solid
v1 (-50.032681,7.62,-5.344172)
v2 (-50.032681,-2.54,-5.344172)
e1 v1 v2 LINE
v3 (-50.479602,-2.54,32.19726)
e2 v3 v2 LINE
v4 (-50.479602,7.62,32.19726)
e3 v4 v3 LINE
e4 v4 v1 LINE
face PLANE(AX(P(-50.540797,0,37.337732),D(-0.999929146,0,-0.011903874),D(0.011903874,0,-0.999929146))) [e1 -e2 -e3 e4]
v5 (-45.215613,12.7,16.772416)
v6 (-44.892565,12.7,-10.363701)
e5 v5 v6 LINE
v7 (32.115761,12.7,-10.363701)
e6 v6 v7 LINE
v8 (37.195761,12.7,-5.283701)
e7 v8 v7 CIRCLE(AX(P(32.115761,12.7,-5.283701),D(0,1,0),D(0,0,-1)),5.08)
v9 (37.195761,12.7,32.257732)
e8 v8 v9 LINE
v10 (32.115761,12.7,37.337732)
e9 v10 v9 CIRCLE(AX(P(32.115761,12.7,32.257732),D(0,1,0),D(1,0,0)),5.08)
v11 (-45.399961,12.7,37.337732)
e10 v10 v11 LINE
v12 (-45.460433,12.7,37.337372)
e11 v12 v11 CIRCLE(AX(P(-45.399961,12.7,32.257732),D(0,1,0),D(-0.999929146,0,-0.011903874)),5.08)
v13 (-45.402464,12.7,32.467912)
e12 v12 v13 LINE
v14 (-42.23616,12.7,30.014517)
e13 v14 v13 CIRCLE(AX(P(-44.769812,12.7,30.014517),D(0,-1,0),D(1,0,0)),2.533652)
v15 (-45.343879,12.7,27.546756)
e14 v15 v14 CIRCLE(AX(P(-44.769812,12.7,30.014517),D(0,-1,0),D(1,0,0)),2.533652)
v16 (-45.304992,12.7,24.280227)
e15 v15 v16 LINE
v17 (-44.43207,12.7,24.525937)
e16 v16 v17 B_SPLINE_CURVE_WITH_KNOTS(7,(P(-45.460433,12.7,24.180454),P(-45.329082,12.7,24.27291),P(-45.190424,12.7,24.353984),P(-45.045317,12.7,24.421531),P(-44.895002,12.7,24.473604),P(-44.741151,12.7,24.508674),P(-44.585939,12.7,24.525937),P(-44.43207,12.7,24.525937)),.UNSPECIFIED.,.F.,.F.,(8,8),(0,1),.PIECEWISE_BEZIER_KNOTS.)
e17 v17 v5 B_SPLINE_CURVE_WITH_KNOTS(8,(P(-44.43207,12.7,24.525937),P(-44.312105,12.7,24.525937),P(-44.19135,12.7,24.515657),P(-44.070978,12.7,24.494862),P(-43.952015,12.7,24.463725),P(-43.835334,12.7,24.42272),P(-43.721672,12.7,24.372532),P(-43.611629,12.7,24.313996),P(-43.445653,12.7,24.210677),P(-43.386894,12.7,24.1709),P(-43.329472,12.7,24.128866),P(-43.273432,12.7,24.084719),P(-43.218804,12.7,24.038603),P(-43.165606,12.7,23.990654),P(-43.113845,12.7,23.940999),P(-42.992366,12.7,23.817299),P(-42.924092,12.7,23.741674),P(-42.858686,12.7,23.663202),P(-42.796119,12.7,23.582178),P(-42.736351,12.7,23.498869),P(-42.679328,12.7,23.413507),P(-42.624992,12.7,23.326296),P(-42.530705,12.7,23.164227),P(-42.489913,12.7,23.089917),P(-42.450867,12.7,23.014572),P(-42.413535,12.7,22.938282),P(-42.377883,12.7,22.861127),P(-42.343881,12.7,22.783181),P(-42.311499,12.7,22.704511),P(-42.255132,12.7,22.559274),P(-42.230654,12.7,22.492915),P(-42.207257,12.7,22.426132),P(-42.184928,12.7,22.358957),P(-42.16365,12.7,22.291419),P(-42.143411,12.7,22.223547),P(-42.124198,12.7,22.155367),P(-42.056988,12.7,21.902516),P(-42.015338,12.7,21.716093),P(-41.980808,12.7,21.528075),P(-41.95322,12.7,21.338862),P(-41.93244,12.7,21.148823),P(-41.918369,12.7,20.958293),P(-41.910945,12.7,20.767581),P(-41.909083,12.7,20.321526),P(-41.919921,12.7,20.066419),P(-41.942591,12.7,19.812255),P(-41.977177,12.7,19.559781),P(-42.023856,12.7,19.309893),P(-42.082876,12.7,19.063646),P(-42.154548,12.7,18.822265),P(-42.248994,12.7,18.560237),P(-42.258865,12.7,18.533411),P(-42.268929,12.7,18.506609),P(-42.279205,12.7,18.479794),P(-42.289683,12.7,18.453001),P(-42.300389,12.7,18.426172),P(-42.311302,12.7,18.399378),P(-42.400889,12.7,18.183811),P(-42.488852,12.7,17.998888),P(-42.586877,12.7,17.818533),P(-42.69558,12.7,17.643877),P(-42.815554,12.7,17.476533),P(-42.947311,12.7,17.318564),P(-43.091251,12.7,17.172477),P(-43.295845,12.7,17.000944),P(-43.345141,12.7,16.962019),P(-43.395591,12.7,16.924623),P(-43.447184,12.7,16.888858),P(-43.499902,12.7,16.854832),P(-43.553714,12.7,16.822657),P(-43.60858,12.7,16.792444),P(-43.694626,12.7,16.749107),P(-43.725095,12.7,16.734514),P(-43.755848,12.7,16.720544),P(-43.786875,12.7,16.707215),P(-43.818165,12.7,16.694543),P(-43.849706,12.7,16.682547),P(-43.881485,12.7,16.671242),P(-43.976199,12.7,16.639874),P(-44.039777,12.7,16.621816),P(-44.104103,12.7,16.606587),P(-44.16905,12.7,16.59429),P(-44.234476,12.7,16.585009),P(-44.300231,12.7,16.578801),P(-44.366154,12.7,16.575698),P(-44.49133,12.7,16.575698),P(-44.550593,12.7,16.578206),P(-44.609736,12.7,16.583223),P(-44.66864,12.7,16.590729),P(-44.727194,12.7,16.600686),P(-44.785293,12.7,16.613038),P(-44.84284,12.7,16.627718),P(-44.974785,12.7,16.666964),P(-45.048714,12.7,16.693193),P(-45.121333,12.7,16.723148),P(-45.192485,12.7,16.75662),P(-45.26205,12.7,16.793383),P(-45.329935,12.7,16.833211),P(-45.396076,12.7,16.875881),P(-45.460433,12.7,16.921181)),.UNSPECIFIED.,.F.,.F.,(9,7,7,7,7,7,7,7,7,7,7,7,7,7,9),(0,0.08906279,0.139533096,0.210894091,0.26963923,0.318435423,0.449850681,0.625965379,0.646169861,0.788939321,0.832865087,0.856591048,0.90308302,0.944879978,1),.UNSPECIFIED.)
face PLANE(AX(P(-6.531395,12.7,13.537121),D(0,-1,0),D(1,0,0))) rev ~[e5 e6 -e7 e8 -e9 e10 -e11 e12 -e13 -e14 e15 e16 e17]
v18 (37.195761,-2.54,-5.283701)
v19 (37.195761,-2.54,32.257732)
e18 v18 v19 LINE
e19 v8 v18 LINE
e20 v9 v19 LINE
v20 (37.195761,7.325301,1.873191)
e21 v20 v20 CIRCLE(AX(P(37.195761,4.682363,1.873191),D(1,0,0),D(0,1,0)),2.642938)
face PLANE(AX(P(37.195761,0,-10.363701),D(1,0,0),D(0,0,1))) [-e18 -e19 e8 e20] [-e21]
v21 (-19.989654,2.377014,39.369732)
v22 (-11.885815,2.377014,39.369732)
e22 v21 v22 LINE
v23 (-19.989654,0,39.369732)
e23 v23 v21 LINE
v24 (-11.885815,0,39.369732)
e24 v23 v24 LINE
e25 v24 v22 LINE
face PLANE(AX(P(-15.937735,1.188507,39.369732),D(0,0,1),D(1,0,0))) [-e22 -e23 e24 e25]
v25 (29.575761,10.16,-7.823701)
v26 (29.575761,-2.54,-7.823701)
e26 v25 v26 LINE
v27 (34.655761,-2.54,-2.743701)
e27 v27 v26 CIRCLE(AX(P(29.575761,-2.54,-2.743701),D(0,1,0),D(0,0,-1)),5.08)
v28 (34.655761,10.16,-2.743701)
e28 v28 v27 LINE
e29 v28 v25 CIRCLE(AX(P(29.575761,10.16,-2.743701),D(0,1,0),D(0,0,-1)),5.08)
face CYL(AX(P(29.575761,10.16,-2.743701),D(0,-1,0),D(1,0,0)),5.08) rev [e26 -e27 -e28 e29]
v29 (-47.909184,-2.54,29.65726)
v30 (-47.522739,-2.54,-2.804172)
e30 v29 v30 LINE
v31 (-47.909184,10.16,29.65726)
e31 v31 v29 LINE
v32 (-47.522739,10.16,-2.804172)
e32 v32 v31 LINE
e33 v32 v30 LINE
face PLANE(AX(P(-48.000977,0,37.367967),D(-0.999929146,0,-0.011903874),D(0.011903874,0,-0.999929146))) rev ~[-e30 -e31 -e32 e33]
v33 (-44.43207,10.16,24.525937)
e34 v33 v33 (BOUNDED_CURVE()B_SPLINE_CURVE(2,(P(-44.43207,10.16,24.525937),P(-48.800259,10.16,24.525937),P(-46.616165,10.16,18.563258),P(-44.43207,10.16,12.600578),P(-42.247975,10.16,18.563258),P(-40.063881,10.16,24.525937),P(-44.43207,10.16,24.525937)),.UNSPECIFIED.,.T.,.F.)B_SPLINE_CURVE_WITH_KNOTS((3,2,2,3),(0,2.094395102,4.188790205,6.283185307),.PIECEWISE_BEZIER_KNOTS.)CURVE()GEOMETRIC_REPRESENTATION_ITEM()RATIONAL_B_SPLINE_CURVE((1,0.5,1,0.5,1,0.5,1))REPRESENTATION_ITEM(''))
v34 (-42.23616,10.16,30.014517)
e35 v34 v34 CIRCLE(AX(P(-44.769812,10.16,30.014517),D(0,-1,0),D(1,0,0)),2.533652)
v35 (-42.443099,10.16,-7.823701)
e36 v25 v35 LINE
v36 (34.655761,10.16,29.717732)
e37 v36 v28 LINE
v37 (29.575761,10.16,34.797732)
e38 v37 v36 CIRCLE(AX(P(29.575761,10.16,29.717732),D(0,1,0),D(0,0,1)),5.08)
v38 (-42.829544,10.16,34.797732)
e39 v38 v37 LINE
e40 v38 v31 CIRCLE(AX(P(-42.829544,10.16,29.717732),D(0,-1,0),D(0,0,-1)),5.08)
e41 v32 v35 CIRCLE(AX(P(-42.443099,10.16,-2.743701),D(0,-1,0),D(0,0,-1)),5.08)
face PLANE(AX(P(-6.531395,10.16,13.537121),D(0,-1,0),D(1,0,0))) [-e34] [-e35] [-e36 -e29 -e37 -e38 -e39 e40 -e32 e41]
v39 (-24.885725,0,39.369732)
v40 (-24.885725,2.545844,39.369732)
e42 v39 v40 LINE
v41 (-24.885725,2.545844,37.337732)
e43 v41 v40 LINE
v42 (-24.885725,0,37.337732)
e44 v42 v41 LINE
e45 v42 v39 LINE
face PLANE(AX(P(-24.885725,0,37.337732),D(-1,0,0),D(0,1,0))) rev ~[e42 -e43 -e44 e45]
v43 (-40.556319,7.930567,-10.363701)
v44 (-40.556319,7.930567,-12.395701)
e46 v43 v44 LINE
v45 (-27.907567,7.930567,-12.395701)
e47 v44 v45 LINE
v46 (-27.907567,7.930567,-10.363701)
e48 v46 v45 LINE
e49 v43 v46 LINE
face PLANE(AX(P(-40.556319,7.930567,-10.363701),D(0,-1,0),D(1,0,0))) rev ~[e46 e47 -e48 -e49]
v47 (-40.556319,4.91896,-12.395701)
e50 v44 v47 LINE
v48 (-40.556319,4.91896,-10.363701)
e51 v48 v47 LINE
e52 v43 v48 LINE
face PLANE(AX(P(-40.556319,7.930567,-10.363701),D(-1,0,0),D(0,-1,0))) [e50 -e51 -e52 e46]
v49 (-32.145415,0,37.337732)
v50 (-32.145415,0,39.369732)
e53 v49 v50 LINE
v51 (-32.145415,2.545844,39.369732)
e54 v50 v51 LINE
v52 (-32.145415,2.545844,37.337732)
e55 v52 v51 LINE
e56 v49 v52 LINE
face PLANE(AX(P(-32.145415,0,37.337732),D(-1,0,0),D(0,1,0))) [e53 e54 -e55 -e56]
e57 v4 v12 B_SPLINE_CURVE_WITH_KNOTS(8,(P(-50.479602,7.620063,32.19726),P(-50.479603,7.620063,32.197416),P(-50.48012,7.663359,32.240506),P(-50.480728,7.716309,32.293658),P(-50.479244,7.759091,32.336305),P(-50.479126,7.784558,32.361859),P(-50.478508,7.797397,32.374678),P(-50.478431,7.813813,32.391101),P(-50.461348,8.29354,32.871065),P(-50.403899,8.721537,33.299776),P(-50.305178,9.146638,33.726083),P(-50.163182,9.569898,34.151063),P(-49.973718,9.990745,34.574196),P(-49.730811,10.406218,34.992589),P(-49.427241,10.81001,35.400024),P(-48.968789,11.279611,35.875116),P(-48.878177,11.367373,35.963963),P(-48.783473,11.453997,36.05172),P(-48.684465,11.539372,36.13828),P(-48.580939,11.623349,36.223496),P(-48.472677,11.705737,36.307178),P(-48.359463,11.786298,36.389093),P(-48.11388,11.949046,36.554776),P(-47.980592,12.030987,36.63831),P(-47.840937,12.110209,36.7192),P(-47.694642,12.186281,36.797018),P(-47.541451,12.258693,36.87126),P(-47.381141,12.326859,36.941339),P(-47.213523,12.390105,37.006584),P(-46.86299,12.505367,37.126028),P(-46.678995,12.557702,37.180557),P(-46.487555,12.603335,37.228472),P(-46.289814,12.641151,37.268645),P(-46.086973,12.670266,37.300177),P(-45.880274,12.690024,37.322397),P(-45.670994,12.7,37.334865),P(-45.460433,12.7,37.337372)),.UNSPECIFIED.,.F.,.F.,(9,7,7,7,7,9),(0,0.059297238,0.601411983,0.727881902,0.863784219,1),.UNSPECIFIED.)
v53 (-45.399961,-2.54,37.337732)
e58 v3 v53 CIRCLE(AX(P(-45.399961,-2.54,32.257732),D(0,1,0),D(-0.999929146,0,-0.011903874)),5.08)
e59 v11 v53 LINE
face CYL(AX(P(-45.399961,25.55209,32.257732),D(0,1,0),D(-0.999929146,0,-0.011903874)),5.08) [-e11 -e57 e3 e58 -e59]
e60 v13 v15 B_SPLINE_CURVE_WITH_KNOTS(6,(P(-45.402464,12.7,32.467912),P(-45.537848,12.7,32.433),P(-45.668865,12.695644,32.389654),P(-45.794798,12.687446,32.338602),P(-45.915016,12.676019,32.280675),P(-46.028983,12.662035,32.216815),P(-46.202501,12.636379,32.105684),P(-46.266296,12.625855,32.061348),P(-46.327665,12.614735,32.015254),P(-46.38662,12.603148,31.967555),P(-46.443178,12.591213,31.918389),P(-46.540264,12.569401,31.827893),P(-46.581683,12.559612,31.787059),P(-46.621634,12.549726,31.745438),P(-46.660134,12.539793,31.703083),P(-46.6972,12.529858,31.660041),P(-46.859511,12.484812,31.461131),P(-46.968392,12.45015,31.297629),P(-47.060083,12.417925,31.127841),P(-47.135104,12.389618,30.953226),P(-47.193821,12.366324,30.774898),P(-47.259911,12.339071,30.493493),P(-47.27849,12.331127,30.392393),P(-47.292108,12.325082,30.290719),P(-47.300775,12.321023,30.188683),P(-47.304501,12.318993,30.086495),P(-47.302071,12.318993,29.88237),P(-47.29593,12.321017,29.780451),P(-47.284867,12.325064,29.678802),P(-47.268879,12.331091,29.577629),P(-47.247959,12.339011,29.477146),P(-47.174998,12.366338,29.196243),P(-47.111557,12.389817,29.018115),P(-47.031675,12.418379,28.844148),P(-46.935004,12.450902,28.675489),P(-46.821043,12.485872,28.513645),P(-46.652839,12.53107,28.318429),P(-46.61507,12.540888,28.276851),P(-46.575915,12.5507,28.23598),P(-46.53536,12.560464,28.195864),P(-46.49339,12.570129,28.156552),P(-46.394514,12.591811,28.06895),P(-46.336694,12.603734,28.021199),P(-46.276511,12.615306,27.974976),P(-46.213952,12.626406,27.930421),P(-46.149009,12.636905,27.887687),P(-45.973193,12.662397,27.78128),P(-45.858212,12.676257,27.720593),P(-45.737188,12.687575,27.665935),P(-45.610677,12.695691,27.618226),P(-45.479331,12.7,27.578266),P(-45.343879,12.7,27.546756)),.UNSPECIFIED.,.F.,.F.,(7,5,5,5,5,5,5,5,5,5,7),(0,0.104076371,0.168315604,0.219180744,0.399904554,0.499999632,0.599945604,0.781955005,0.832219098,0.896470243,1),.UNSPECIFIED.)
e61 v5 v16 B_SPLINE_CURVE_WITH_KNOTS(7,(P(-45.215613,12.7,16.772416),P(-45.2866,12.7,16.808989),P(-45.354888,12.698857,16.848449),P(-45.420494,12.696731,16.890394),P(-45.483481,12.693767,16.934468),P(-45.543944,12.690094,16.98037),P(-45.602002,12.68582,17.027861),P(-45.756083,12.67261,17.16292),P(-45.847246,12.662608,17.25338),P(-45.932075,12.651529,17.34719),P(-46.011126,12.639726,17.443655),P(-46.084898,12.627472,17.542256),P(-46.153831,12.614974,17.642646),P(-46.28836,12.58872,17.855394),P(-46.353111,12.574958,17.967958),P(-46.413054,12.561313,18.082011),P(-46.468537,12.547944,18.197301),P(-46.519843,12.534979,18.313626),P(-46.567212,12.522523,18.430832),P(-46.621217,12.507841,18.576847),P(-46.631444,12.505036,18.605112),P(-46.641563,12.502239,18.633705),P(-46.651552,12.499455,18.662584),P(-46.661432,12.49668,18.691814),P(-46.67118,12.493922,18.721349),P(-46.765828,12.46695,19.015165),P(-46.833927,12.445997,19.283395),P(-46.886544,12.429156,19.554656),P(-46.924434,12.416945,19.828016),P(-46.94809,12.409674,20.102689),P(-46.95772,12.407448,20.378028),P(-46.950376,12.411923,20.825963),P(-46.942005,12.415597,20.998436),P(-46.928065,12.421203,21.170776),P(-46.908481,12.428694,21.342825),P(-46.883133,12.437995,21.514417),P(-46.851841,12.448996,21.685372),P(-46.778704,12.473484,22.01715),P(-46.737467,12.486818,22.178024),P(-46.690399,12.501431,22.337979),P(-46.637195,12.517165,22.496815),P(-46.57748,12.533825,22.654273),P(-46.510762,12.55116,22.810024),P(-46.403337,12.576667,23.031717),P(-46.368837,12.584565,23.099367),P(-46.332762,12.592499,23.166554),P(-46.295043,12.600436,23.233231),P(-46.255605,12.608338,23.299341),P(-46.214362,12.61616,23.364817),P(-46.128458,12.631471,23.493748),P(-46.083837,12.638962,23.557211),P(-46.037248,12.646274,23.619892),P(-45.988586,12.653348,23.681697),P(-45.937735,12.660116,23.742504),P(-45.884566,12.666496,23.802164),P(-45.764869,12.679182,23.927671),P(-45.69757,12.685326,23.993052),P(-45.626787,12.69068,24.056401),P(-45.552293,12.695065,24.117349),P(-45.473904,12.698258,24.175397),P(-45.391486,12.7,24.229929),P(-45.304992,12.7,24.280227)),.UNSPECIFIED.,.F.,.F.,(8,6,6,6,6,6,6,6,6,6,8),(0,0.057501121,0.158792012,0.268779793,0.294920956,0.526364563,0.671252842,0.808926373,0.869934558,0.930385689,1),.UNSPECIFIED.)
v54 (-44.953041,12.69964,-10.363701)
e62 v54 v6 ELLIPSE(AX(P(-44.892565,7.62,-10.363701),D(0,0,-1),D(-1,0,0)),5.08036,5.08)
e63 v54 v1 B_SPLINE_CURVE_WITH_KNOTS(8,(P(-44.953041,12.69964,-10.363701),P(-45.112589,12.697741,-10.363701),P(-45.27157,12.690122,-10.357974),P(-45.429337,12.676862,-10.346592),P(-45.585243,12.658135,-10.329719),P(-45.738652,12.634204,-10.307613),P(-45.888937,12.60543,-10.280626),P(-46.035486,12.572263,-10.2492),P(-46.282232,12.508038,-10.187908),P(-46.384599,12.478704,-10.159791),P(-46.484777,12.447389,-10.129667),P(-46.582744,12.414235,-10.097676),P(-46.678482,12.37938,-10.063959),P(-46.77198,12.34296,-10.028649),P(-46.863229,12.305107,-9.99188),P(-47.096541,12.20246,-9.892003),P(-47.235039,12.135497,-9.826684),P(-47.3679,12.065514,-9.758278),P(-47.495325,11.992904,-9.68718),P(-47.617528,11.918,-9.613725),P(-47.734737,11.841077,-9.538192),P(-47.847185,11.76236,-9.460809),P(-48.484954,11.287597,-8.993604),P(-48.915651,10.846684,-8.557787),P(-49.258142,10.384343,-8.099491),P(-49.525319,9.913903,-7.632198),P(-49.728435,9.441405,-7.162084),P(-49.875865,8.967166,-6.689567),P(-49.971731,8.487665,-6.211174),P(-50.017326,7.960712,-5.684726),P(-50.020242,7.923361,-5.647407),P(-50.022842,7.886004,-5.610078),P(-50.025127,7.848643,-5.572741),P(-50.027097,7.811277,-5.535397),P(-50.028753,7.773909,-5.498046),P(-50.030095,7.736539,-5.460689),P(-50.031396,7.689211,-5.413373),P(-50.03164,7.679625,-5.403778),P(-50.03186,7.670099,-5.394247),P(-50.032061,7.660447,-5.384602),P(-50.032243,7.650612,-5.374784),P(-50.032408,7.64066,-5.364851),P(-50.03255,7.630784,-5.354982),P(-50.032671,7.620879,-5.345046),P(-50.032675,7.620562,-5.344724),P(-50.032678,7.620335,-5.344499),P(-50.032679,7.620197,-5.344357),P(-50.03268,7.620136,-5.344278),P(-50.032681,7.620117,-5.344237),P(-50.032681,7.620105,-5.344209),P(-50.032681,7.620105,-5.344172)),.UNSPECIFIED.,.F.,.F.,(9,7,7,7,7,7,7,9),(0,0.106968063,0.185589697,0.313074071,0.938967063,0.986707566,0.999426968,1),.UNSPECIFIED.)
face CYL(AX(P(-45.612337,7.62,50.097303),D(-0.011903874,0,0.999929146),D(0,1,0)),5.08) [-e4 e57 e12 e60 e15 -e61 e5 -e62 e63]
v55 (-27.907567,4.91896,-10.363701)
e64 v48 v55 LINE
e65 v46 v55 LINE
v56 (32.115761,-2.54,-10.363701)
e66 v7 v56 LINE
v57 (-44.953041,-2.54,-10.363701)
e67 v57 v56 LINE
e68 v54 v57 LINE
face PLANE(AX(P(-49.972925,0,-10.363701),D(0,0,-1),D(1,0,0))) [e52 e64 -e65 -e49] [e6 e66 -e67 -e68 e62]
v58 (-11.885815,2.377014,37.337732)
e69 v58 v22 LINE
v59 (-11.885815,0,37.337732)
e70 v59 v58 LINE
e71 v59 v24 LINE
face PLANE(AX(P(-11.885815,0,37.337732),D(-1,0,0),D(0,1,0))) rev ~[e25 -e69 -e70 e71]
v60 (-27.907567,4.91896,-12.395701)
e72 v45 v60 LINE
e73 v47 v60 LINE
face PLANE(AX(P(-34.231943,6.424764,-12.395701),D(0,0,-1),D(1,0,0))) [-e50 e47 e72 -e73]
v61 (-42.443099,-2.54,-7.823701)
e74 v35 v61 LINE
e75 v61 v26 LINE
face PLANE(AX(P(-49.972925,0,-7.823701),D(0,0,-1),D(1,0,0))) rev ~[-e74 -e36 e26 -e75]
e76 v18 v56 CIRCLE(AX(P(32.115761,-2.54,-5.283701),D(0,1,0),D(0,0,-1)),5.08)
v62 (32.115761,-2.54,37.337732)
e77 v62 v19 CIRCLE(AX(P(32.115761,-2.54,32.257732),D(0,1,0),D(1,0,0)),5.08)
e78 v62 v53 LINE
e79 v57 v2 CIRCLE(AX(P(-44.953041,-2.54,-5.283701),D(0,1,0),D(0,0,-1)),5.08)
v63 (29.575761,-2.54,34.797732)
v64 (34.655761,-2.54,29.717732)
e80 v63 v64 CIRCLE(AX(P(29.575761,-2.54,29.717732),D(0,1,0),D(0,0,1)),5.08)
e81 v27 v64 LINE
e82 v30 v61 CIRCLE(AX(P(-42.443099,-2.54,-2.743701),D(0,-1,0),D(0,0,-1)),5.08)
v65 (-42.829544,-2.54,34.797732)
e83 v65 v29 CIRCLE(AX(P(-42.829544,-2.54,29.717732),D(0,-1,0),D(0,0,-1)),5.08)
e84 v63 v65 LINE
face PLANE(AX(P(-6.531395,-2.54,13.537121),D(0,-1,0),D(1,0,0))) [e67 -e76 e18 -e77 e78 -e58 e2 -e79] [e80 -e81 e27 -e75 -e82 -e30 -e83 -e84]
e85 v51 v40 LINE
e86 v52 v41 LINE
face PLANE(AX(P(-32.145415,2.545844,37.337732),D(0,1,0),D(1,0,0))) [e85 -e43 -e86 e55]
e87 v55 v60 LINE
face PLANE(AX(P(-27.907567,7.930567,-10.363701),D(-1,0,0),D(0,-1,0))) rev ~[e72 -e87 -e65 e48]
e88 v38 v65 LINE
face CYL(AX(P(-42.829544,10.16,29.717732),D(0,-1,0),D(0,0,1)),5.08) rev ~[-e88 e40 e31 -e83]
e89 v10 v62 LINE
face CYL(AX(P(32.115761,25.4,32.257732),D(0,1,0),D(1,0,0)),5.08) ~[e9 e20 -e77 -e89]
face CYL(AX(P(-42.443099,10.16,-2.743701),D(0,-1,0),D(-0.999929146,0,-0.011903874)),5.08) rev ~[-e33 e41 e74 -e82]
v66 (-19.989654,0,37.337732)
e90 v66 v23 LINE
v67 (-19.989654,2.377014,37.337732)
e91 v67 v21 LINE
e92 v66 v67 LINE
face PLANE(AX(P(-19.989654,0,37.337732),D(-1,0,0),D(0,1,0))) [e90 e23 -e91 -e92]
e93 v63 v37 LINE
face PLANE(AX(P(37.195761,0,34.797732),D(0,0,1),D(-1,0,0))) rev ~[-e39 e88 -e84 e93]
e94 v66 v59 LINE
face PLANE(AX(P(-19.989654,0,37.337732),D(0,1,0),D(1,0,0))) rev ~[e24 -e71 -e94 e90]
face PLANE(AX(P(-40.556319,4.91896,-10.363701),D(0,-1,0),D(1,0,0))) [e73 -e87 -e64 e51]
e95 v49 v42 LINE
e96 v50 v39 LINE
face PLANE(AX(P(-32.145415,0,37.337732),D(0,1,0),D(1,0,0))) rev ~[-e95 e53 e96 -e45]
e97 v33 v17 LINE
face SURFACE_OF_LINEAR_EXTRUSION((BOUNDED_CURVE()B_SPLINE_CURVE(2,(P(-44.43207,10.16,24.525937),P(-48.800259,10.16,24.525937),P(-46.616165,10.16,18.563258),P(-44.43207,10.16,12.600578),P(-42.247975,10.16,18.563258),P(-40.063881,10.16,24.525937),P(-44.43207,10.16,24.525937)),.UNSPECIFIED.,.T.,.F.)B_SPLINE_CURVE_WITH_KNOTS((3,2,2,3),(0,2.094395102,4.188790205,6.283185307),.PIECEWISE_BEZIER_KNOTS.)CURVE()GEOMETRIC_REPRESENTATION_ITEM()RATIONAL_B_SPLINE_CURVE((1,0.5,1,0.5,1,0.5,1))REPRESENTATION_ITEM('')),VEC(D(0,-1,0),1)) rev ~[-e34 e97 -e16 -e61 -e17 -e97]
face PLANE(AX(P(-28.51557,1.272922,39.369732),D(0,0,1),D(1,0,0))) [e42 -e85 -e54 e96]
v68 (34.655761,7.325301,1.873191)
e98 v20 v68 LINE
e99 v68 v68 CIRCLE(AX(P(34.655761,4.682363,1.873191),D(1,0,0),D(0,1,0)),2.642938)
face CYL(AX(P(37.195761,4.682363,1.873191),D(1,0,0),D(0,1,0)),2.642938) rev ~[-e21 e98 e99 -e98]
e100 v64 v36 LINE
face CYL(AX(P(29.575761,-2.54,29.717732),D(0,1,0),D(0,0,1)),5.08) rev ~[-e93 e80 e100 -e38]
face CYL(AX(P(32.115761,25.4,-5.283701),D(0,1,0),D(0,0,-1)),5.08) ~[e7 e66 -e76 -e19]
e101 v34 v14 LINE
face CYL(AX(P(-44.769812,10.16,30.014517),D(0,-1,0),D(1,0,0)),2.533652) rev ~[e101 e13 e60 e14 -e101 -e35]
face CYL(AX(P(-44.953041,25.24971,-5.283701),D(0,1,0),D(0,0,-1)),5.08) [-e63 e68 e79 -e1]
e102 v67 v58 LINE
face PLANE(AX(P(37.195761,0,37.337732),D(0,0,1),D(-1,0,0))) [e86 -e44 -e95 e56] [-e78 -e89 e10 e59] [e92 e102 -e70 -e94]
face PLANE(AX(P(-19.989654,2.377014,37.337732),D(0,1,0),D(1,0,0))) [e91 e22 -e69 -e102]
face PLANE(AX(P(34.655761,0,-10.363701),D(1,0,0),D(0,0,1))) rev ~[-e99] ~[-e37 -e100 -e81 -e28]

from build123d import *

# Parameters (mm, degrees)
F1_DEPTH    = 12.7
F2_T        = -2.54
F3_R        = 2.5336521523
F4_DEPTH    = 25.4
F5_W        = 12.6487519592
F5_H        = 3.011607565
F6_DEPTH    = 2.032
F7_T1_DEPTH = 51.1041796342
F7_T3_DEPTH = 73.1048124282
F7_T5_DEPTH = 50.4994199847
F7_T7_DEPTH = 50.8
F8_W        = 7.2596892715
F8_H        = 2.5458435994
F8_W_2      = 8.1038391218
F8_H_2      = 2.3770136759
F9_DEPTH    = 2.032
F11_DEPTH   = 5.334
F12_DEPTH   = 10.16
F13_R       = 5.08
F14_R       = 2.6429379381
F15_DEPTH   = 25.4


# Not quite as in the source:
# - a fillet or chamfer that OpenCascade refuses, or shapes differently, is made with other operations: its cross-section is extruded or revolved along the edge and cut away or added


with BuildPart() as f1:
    # F0 (on Front) → F1 (new body, symmetric)
    with BuildSketch(Plane.XZ):
        Polygon((37.1957607567, 37.33773157), (-50.5407974124, 37.33773157), (-49.9729253352, -10.3637007996), (37.1957607567, -10.3637007996), align=None)
    extrude(amount=F1_DEPTH, both=True)

    # F2
    f2_openings = [f1.faces().sort_by_distance(p)[0] for p in [
        (-6.530704, -12.7, 13.512828),
    ]]
    offset(amount=F2_T, openings=f2_openings)

    # F3 (on face) → F4 (cut)
    with BuildSketch(Plane.XZ.offset(-10.16)):
        with Locations((-44.7698123753, 30.0145167857)):
            Circle(F3_R)
    extrude(amount=-F4_DEPTH, mode=Mode.SUBTRACT)

    # F5 (on face) → F6 (join)
    with BuildSketch(Plane(origin=(0, 0, -10.3637007996), x_dir=(1, 0, 0), z_dir=(0, 0, -1))):
        with Locations((-34.2319430783, -6.4247637056)):
            Rectangle(F5_W, F5_H)
    extrude(amount=F6_DEPTH)

    # F7: fillet of radius 5.08 on 5 edges, made by hand

    # F7_s2 → F7_t1 (cut)
    with BuildSketch(Plane.XZ.offset(-25.5520898171)):
        with BuildLine():
            ThreePointArc((-50.4796015492, 32.19725989), (-49.0133806513, 35.8283900433), (-45.3999614856, 37.33773157))
            Line((-45.3999614856, 37.33773157), (-50.5407974124, 37.33773157))
            Line((-50.5407974124, 37.33773157), (-50.4796015492, 32.19725989))
        make_face()
    extrude(amount=F7_T1_DEPTH, mode=Mode.SUBTRACT)

    # F7_s4 → F7_t3 (cut)
    with BuildSketch(Plane(origin=(-0.602773104, 0, 50.6331295472), x_dir=(0, 1, 0), z_dir=(0.011903874, 0, -0.9999291464))):
        with BuildLine():
            ThreePointArc((12.7, -45.0127527613), (11.2121024484, -48.6048552097), (7.62, -50.0927527613))
            Line((7.62, -50.0927527613), (12.7, -50.0927527613))
            Line((12.7, -50.0927527613), (12.7, -45.0127527613))
        make_face()
    extrude(amount=F7_T3_DEPTH, mode=Mode.SUBTRACT)

    # F7_s6 → F7_t5 (cut)
    with BuildSketch(Plane.XZ.offset(-25.2497099923)):
        with BuildLine():
            ThreePointArc((-44.9530413382, -10.3637007996), (-48.5236998115, -8.8971199654), (-50.0326814019, -5.3441724797))
            Line((-50.0326814019, -5.3441724797), (-49.9729253352, -10.3637007996))
            Line((-49.9729253352, -10.3637007996), (-44.9530413382, -10.3637007996))
        make_face()
    extrude(amount=F7_T5_DEPTH, mode=Mode.SUBTRACT)

    # F7_s8 → F7_t7 (cut)
    with BuildSketch(Plane.XZ.offset(-25.4)):
        with BuildLine():
            ThreePointArc((32.1157607567, -10.3637007996), (35.7078632052, -8.8758032481), (37.1957607567, -5.2837007996))
            Line((37.1957607567, -5.2837007996), (37.1957607567, -10.3637007996))
            Line((37.1957607567, -10.3637007996), (32.1157607567, -10.3637007996))
        make_face()
        with BuildLine():
            ThreePointArc((37.1957607567, 32.25773157), (35.7078632052, 35.8498340184), (32.1157607567, 37.33773157))
            Line((32.1157607567, 37.33773157), (37.1957607567, 37.33773157))
            Line((37.1957607567, 37.33773157), (37.1957607567, 32.25773157))
        make_face()
    extrude(amount=F7_T7_DEPTH, mode=Mode.SUBTRACT)

    # F8 (on face) → F9 (join)
    with BuildSketch(Plane.XY.offset(37.33773157)):
        with Locations((-28.5155698657, 1.2729217997)):
            Rectangle(F8_W, F8_H)
        with Locations((-15.9377348609, 1.1885068379)):
            Rectangle(F8_W_2, F8_H_2)
    extrude(amount=F9_DEPTH)

    # F10 (on face) → F11 (cut)
    with BuildSketch(Plane.XZ.offset(-10.16)):
        with BuildLine():
            add(Edge.make_bspline(
                [(-44.4320701063, 24.525936693), (-48.8002594528, 24.525936693), (-46.6161647795, 18.5632575303), (-44.4320701063, 12.6005783677), (-42.247975433, 18.5632575303), (-40.0638807598, 24.525936693), (-44.4320701063, 24.525936693)],
                knots=[0, 0, 0, 2.0943951024, 2.0943951024, 4.1887902048, 4.1887902048, 6.2831853072, 6.2831853072, 6.2831853072], degree=2, weights=[1, 0.5, 1, 0.5, 1, 0.5, 1]))
        make_face()
    extrude(amount=-F11_DEPTH, mode=Mode.SUBTRACT)

    # F12 (cut): a face of the model
    f12_faces = [f1.faces().sort_by_distance(p)[0] for p in [
        (-48.3034140755, -12.7, 35.1268251117),
    ]]
    extrude(f12_faces, amount=-F12_DEPTH, mode=Mode.SUBTRACT)

    # F13
    f13_edges = [f1.edges().sort_by_distance(p)[0] for p in [
        (-47.462983, 3.81, -7.823701),
        (-47.970379, 3.81, 34.797732),
        (34.655761, 3.81, -7.823701),
        (34.655761, 3.81, 34.797732),
    ]]
    fillet(f13_edges, radius=F13_R)

    # F14 (on face) → F15 (cut)
    with BuildSketch(Plane.YZ.offset(37.1957607567)):
        with Locations((4.6823634766, 1.8731907476)):
            Circle(F14_R)
    extrude(amount=-F15_DEPTH, mode=Mode.SUBTRACT)


solid = f1.part
